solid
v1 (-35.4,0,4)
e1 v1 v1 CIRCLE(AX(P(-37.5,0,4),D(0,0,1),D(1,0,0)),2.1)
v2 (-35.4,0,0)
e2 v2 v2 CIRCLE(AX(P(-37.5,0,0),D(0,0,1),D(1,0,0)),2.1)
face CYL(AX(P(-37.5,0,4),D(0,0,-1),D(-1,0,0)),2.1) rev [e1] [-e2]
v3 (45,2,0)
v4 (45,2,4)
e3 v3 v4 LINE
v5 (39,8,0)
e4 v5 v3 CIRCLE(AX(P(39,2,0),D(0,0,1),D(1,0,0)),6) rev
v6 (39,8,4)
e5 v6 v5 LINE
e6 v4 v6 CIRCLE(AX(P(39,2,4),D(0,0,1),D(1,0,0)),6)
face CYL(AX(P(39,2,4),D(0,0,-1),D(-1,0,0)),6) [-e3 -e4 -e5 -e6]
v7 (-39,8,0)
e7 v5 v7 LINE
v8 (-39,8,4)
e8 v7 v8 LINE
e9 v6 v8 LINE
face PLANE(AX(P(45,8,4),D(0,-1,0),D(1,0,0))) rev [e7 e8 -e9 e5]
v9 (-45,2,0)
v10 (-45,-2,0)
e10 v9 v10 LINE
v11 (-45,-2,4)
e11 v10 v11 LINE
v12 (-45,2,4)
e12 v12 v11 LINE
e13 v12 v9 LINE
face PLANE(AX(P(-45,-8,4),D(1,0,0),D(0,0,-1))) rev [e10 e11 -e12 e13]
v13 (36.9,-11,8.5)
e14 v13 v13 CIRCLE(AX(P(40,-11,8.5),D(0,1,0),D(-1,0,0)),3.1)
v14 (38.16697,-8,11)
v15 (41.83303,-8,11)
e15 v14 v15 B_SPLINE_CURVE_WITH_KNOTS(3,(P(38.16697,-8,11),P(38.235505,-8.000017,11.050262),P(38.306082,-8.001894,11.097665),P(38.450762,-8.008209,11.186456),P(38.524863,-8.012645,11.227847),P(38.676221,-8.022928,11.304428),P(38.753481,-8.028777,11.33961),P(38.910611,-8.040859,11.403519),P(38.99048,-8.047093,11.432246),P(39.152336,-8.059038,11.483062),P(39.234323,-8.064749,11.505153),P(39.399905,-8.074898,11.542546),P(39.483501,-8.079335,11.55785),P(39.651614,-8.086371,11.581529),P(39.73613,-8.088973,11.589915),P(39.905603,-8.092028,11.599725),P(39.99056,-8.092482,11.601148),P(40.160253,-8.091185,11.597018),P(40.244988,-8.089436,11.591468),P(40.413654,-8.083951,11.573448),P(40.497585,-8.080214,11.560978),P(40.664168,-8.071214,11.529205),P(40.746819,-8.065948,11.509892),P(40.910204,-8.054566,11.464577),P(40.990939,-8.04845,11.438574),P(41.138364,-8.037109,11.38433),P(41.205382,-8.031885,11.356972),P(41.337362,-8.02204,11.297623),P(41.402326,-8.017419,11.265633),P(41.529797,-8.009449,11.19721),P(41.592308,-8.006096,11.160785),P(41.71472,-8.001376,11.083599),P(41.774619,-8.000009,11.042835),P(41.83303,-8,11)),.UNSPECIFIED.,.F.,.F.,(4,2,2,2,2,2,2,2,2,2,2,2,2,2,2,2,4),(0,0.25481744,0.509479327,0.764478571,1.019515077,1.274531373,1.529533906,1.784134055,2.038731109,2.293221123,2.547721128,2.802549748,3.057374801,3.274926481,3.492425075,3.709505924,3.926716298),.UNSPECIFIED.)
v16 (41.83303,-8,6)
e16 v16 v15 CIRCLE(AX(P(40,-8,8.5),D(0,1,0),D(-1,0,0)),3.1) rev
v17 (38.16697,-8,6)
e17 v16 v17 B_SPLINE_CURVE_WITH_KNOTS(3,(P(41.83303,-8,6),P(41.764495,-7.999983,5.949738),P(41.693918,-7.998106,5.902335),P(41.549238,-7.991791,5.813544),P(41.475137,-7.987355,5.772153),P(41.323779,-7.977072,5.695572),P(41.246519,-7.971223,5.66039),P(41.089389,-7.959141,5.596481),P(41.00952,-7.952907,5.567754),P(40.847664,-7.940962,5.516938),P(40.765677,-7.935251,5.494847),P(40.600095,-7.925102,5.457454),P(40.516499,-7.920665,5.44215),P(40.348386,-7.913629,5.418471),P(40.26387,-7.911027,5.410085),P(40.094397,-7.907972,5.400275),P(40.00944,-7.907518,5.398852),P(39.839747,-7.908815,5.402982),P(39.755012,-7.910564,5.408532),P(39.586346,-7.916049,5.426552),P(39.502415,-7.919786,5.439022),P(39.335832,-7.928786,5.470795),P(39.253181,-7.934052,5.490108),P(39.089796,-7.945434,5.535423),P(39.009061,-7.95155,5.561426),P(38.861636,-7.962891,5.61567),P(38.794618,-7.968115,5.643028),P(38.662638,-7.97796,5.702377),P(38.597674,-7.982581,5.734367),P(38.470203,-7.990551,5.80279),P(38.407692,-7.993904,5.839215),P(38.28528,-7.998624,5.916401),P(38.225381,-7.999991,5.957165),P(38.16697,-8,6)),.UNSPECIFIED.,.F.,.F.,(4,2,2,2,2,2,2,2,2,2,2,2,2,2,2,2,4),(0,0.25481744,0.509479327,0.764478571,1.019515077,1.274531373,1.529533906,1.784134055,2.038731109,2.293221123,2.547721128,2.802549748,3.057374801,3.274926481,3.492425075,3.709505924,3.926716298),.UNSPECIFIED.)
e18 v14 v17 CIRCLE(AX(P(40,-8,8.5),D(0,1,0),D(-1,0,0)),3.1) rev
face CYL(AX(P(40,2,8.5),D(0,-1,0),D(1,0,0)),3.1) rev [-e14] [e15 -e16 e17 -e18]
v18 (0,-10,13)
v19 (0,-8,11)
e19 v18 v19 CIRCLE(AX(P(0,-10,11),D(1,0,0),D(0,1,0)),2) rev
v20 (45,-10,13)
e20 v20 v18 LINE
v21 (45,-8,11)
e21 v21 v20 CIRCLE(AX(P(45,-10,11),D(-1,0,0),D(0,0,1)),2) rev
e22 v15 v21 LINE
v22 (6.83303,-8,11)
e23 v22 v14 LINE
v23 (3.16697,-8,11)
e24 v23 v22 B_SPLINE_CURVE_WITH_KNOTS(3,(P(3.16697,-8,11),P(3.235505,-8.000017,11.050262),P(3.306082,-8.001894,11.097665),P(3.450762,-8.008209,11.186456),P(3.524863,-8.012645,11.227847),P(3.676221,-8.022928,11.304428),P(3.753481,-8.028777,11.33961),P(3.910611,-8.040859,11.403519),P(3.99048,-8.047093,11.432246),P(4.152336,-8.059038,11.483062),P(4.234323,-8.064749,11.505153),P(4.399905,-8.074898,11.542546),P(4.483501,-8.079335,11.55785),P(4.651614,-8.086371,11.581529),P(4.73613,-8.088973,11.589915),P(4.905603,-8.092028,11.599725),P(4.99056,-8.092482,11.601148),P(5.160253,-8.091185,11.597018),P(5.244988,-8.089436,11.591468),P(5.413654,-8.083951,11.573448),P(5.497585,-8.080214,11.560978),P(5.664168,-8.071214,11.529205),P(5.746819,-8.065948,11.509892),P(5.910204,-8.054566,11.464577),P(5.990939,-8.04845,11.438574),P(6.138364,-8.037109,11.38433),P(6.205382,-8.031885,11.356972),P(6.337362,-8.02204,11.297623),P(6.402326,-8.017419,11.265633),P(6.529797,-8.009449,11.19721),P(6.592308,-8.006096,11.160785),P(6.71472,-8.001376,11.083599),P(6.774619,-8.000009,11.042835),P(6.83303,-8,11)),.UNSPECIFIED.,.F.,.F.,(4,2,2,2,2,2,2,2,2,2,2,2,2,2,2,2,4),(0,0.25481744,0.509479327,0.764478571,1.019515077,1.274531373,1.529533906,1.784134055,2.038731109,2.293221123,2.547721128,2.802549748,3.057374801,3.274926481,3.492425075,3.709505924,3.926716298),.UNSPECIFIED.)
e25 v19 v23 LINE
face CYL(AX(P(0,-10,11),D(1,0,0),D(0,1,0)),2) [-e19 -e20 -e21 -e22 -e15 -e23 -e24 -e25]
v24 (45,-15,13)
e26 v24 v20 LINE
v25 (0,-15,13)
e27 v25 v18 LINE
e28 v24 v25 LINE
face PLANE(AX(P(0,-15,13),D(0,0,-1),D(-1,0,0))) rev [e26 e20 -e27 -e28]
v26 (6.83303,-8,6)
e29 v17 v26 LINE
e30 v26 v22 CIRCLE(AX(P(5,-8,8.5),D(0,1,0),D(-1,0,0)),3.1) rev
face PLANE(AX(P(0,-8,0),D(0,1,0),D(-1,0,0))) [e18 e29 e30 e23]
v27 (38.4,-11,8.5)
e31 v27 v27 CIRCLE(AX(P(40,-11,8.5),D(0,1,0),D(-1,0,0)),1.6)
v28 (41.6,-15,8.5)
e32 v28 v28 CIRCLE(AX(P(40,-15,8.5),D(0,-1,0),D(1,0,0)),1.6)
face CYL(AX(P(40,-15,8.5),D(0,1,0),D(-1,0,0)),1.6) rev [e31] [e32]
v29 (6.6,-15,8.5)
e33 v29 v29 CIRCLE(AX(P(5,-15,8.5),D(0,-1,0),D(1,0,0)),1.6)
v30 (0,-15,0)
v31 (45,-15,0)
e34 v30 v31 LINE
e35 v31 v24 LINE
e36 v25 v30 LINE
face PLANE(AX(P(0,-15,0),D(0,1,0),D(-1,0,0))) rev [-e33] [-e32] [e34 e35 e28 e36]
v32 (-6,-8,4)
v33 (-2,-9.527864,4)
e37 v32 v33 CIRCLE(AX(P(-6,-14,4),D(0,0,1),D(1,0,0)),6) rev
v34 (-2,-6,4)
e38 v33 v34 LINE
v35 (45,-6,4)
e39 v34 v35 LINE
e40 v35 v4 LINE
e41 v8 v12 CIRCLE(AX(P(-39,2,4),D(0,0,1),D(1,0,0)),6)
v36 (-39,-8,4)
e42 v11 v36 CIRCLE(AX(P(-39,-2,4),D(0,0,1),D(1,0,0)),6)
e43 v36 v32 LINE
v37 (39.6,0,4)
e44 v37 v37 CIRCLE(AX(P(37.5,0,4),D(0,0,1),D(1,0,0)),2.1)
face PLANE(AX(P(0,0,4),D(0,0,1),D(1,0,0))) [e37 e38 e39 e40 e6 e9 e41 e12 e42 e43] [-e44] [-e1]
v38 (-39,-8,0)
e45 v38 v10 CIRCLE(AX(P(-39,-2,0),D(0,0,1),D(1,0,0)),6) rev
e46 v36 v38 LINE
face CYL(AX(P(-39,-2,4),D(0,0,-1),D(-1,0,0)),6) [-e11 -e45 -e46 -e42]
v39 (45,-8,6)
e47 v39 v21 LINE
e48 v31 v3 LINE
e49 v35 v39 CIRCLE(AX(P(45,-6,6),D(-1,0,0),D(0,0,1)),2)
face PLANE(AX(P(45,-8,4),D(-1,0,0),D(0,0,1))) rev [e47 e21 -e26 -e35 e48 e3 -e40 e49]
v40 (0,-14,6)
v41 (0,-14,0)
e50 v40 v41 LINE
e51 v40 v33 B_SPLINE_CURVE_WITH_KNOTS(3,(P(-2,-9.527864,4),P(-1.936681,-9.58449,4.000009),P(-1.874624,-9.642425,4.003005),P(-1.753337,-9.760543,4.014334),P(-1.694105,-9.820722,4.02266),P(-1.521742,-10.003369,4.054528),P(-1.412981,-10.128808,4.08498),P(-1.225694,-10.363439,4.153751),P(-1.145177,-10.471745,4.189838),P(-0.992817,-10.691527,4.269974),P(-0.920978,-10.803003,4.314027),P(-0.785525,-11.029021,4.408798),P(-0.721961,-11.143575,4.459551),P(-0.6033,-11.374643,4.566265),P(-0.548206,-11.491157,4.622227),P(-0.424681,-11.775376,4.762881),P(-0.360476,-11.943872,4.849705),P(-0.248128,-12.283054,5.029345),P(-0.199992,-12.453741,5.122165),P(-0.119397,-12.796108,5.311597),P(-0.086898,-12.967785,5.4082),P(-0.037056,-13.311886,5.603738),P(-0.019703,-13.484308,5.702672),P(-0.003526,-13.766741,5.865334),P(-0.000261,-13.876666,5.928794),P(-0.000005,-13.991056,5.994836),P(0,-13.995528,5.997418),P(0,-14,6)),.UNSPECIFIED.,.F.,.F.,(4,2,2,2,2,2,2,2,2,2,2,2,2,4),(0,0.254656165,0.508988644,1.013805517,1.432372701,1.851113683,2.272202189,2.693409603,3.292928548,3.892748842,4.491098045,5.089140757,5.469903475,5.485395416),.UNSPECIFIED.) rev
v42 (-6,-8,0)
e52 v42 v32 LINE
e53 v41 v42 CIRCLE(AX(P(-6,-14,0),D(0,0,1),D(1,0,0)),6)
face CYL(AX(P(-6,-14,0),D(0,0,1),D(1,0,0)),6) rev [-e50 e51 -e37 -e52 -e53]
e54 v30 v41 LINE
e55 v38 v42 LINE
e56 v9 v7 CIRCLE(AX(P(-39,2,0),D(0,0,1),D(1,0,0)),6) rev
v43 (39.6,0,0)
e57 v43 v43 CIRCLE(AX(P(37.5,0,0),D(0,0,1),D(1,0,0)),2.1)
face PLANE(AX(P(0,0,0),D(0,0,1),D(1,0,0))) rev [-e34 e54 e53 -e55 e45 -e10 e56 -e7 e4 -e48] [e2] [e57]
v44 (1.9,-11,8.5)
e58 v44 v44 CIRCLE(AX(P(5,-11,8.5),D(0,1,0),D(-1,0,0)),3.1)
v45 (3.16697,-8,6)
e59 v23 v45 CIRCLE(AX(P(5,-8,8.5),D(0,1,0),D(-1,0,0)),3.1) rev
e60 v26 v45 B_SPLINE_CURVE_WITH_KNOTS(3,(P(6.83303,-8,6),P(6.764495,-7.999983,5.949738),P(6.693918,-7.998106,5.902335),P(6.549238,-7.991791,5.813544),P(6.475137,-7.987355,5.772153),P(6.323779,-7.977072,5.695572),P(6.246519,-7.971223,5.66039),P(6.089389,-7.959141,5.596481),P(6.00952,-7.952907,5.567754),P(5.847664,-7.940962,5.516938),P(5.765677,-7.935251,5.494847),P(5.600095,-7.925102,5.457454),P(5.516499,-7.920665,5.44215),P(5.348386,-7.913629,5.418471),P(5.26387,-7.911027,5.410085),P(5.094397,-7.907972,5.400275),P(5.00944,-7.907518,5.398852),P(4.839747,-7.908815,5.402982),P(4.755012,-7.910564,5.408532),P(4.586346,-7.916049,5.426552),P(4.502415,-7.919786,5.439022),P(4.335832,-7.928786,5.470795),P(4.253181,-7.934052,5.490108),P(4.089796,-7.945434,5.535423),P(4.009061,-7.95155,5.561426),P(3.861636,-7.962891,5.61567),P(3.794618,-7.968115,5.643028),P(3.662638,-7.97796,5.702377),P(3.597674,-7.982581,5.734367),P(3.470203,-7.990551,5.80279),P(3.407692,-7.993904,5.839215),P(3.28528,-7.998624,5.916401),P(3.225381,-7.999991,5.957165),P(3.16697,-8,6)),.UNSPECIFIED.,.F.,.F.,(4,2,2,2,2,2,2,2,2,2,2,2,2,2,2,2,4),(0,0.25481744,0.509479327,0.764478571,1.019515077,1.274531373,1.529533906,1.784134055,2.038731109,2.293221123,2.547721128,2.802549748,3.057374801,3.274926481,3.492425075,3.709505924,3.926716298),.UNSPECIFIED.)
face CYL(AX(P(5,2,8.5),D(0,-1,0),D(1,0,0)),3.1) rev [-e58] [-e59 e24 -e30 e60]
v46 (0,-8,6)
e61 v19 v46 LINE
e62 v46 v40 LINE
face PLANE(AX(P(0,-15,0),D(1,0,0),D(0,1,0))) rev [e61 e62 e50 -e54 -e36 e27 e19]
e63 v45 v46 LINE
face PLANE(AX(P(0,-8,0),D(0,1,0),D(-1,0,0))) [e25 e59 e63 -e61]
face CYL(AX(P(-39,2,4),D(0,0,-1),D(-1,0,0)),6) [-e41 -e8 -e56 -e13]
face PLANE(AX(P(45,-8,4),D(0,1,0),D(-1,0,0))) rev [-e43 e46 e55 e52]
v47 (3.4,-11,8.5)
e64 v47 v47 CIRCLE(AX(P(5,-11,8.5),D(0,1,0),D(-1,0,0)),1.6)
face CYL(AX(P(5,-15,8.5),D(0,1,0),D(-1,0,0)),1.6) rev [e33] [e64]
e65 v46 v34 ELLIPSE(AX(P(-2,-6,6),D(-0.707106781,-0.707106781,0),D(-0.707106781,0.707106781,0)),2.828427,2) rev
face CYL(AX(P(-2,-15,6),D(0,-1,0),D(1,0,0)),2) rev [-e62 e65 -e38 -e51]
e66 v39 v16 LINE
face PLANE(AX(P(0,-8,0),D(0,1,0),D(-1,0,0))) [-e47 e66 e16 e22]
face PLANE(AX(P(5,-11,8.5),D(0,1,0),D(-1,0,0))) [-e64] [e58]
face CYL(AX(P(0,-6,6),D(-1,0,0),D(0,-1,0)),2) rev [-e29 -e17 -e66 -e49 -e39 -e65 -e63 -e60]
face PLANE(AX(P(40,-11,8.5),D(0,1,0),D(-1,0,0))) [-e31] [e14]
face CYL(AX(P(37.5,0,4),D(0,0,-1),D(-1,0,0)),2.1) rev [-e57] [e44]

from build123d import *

# Parameters (mm, degrees)
ESBO_O1_W                  = 90
ESBO_O1_H                  = 16
ESBO_O1_R                  = 2.1
RESSALTO_EXTRUS_O1_DEPTH   = 4
ESBO_O2_W                  = 45
ESBO_O2_H                  = 13
ESBO_O2_R                  = 1.6
RESSALTO_EXTRUS_O3_DEPTH   = 7
FILETE1_R                  = 6
FILETE2_R                  = 2
CORTE_EXTRUS_O1_DEPTH      = 10
CORTE_EXTRUS_O1_DEPTH_BACK = 3
ESBO_O3_R                  = 3.1
FILETE3_R                  = 2


with BuildPart() as part:
    # Esboço1 → Ressalto-extrusão1 (new body)
    with BuildSketch(Plane.XY):
        Rectangle(ESBO_O1_W, ESBO_O1_H)
        with Locations((-37.5, 0)):
            Circle(ESBO_O1_R, mode=Mode.SUBTRACT)
        with Locations((37.5, 0)):
            Circle(ESBO_O1_R, mode=Mode.SUBTRACT)
    extrude(amount=RESSALTO_EXTRUS_O1_DEPTH)

    # Esboço2 → Ressalto-extrusão3 (add)
    with BuildSketch(Plane.XZ.offset(8)):
        with Locations((22.5, 6.5)):
            Rectangle(ESBO_O2_W, ESBO_O2_H)
        with Locations((40, 8.5)):
            Circle(ESBO_O2_R, mode=Mode.SUBTRACT)
        with Locations((5, 8.5)):
            Circle(ESBO_O2_R, mode=Mode.SUBTRACT)
    extrude(amount=RESSALTO_EXTRUS_O3_DEPTH)

    # Filete1
    filete1_edges = [part.edges().sort_by_distance(p)[0] for p in [
        (0, -8, 2),
        (-45, 8, 2),
        (45, 8, 2),
        (-45, -8, 2),
    ]]
    fillet(filete1_edges, radius=FILETE1_R)

    # Filete2
    filete2_edges = [part.edges().sort_by_distance(p)[0] for p in [
        (22.5, -8, 4),
        (0, -11, 4),
    ]]
    fillet(filete2_edges, radius=FILETE2_R)

    # Esboço3 → Corte-extrusão1 (cut, two sides: drawn at the far end of the back side and taken through both)
    with BuildSketch(Plane(origin=(0, -8, 0), x_dir=(1, 0, 0), z_dir=(0, 1, 0)).offset(-CORTE_EXTRUS_O1_DEPTH_BACK)):
        with Locations(Location((5, -8.5, 0), (0, 0, 53.750679117))):
            Circle(ESBO_O3_R)
        with Locations(Location((40, -8.5, 0), (0, 0, 53.750679117))):
            Circle(ESBO_O3_R)
    extrude(amount=CORTE_EXTRUS_O1_DEPTH + CORTE_EXTRUS_O1_DEPTH_BACK, mode=Mode.SUBTRACT)

    # Filete3
    # the kernel refuses this fillet: 2 mm, written as the material it takes off along each edge
    with BuildSketch(Plane(origin=(50, -8, 13), x_dir=(0, 0, -1), z_dir=(-1, 0, 0))) as filete3_piece_1:
        with BuildLine():
            CenterArc((FILETE3_R, FILETE3_R), FILETE3_R, 180, 90)
            Line((0, FILETE3_R), (0, 0))
            Line((0, 0), (FILETE3_R, 0))
        make_face()
    extrude(amount=55, mode=Mode.SUBTRACT)


solid = part.part
